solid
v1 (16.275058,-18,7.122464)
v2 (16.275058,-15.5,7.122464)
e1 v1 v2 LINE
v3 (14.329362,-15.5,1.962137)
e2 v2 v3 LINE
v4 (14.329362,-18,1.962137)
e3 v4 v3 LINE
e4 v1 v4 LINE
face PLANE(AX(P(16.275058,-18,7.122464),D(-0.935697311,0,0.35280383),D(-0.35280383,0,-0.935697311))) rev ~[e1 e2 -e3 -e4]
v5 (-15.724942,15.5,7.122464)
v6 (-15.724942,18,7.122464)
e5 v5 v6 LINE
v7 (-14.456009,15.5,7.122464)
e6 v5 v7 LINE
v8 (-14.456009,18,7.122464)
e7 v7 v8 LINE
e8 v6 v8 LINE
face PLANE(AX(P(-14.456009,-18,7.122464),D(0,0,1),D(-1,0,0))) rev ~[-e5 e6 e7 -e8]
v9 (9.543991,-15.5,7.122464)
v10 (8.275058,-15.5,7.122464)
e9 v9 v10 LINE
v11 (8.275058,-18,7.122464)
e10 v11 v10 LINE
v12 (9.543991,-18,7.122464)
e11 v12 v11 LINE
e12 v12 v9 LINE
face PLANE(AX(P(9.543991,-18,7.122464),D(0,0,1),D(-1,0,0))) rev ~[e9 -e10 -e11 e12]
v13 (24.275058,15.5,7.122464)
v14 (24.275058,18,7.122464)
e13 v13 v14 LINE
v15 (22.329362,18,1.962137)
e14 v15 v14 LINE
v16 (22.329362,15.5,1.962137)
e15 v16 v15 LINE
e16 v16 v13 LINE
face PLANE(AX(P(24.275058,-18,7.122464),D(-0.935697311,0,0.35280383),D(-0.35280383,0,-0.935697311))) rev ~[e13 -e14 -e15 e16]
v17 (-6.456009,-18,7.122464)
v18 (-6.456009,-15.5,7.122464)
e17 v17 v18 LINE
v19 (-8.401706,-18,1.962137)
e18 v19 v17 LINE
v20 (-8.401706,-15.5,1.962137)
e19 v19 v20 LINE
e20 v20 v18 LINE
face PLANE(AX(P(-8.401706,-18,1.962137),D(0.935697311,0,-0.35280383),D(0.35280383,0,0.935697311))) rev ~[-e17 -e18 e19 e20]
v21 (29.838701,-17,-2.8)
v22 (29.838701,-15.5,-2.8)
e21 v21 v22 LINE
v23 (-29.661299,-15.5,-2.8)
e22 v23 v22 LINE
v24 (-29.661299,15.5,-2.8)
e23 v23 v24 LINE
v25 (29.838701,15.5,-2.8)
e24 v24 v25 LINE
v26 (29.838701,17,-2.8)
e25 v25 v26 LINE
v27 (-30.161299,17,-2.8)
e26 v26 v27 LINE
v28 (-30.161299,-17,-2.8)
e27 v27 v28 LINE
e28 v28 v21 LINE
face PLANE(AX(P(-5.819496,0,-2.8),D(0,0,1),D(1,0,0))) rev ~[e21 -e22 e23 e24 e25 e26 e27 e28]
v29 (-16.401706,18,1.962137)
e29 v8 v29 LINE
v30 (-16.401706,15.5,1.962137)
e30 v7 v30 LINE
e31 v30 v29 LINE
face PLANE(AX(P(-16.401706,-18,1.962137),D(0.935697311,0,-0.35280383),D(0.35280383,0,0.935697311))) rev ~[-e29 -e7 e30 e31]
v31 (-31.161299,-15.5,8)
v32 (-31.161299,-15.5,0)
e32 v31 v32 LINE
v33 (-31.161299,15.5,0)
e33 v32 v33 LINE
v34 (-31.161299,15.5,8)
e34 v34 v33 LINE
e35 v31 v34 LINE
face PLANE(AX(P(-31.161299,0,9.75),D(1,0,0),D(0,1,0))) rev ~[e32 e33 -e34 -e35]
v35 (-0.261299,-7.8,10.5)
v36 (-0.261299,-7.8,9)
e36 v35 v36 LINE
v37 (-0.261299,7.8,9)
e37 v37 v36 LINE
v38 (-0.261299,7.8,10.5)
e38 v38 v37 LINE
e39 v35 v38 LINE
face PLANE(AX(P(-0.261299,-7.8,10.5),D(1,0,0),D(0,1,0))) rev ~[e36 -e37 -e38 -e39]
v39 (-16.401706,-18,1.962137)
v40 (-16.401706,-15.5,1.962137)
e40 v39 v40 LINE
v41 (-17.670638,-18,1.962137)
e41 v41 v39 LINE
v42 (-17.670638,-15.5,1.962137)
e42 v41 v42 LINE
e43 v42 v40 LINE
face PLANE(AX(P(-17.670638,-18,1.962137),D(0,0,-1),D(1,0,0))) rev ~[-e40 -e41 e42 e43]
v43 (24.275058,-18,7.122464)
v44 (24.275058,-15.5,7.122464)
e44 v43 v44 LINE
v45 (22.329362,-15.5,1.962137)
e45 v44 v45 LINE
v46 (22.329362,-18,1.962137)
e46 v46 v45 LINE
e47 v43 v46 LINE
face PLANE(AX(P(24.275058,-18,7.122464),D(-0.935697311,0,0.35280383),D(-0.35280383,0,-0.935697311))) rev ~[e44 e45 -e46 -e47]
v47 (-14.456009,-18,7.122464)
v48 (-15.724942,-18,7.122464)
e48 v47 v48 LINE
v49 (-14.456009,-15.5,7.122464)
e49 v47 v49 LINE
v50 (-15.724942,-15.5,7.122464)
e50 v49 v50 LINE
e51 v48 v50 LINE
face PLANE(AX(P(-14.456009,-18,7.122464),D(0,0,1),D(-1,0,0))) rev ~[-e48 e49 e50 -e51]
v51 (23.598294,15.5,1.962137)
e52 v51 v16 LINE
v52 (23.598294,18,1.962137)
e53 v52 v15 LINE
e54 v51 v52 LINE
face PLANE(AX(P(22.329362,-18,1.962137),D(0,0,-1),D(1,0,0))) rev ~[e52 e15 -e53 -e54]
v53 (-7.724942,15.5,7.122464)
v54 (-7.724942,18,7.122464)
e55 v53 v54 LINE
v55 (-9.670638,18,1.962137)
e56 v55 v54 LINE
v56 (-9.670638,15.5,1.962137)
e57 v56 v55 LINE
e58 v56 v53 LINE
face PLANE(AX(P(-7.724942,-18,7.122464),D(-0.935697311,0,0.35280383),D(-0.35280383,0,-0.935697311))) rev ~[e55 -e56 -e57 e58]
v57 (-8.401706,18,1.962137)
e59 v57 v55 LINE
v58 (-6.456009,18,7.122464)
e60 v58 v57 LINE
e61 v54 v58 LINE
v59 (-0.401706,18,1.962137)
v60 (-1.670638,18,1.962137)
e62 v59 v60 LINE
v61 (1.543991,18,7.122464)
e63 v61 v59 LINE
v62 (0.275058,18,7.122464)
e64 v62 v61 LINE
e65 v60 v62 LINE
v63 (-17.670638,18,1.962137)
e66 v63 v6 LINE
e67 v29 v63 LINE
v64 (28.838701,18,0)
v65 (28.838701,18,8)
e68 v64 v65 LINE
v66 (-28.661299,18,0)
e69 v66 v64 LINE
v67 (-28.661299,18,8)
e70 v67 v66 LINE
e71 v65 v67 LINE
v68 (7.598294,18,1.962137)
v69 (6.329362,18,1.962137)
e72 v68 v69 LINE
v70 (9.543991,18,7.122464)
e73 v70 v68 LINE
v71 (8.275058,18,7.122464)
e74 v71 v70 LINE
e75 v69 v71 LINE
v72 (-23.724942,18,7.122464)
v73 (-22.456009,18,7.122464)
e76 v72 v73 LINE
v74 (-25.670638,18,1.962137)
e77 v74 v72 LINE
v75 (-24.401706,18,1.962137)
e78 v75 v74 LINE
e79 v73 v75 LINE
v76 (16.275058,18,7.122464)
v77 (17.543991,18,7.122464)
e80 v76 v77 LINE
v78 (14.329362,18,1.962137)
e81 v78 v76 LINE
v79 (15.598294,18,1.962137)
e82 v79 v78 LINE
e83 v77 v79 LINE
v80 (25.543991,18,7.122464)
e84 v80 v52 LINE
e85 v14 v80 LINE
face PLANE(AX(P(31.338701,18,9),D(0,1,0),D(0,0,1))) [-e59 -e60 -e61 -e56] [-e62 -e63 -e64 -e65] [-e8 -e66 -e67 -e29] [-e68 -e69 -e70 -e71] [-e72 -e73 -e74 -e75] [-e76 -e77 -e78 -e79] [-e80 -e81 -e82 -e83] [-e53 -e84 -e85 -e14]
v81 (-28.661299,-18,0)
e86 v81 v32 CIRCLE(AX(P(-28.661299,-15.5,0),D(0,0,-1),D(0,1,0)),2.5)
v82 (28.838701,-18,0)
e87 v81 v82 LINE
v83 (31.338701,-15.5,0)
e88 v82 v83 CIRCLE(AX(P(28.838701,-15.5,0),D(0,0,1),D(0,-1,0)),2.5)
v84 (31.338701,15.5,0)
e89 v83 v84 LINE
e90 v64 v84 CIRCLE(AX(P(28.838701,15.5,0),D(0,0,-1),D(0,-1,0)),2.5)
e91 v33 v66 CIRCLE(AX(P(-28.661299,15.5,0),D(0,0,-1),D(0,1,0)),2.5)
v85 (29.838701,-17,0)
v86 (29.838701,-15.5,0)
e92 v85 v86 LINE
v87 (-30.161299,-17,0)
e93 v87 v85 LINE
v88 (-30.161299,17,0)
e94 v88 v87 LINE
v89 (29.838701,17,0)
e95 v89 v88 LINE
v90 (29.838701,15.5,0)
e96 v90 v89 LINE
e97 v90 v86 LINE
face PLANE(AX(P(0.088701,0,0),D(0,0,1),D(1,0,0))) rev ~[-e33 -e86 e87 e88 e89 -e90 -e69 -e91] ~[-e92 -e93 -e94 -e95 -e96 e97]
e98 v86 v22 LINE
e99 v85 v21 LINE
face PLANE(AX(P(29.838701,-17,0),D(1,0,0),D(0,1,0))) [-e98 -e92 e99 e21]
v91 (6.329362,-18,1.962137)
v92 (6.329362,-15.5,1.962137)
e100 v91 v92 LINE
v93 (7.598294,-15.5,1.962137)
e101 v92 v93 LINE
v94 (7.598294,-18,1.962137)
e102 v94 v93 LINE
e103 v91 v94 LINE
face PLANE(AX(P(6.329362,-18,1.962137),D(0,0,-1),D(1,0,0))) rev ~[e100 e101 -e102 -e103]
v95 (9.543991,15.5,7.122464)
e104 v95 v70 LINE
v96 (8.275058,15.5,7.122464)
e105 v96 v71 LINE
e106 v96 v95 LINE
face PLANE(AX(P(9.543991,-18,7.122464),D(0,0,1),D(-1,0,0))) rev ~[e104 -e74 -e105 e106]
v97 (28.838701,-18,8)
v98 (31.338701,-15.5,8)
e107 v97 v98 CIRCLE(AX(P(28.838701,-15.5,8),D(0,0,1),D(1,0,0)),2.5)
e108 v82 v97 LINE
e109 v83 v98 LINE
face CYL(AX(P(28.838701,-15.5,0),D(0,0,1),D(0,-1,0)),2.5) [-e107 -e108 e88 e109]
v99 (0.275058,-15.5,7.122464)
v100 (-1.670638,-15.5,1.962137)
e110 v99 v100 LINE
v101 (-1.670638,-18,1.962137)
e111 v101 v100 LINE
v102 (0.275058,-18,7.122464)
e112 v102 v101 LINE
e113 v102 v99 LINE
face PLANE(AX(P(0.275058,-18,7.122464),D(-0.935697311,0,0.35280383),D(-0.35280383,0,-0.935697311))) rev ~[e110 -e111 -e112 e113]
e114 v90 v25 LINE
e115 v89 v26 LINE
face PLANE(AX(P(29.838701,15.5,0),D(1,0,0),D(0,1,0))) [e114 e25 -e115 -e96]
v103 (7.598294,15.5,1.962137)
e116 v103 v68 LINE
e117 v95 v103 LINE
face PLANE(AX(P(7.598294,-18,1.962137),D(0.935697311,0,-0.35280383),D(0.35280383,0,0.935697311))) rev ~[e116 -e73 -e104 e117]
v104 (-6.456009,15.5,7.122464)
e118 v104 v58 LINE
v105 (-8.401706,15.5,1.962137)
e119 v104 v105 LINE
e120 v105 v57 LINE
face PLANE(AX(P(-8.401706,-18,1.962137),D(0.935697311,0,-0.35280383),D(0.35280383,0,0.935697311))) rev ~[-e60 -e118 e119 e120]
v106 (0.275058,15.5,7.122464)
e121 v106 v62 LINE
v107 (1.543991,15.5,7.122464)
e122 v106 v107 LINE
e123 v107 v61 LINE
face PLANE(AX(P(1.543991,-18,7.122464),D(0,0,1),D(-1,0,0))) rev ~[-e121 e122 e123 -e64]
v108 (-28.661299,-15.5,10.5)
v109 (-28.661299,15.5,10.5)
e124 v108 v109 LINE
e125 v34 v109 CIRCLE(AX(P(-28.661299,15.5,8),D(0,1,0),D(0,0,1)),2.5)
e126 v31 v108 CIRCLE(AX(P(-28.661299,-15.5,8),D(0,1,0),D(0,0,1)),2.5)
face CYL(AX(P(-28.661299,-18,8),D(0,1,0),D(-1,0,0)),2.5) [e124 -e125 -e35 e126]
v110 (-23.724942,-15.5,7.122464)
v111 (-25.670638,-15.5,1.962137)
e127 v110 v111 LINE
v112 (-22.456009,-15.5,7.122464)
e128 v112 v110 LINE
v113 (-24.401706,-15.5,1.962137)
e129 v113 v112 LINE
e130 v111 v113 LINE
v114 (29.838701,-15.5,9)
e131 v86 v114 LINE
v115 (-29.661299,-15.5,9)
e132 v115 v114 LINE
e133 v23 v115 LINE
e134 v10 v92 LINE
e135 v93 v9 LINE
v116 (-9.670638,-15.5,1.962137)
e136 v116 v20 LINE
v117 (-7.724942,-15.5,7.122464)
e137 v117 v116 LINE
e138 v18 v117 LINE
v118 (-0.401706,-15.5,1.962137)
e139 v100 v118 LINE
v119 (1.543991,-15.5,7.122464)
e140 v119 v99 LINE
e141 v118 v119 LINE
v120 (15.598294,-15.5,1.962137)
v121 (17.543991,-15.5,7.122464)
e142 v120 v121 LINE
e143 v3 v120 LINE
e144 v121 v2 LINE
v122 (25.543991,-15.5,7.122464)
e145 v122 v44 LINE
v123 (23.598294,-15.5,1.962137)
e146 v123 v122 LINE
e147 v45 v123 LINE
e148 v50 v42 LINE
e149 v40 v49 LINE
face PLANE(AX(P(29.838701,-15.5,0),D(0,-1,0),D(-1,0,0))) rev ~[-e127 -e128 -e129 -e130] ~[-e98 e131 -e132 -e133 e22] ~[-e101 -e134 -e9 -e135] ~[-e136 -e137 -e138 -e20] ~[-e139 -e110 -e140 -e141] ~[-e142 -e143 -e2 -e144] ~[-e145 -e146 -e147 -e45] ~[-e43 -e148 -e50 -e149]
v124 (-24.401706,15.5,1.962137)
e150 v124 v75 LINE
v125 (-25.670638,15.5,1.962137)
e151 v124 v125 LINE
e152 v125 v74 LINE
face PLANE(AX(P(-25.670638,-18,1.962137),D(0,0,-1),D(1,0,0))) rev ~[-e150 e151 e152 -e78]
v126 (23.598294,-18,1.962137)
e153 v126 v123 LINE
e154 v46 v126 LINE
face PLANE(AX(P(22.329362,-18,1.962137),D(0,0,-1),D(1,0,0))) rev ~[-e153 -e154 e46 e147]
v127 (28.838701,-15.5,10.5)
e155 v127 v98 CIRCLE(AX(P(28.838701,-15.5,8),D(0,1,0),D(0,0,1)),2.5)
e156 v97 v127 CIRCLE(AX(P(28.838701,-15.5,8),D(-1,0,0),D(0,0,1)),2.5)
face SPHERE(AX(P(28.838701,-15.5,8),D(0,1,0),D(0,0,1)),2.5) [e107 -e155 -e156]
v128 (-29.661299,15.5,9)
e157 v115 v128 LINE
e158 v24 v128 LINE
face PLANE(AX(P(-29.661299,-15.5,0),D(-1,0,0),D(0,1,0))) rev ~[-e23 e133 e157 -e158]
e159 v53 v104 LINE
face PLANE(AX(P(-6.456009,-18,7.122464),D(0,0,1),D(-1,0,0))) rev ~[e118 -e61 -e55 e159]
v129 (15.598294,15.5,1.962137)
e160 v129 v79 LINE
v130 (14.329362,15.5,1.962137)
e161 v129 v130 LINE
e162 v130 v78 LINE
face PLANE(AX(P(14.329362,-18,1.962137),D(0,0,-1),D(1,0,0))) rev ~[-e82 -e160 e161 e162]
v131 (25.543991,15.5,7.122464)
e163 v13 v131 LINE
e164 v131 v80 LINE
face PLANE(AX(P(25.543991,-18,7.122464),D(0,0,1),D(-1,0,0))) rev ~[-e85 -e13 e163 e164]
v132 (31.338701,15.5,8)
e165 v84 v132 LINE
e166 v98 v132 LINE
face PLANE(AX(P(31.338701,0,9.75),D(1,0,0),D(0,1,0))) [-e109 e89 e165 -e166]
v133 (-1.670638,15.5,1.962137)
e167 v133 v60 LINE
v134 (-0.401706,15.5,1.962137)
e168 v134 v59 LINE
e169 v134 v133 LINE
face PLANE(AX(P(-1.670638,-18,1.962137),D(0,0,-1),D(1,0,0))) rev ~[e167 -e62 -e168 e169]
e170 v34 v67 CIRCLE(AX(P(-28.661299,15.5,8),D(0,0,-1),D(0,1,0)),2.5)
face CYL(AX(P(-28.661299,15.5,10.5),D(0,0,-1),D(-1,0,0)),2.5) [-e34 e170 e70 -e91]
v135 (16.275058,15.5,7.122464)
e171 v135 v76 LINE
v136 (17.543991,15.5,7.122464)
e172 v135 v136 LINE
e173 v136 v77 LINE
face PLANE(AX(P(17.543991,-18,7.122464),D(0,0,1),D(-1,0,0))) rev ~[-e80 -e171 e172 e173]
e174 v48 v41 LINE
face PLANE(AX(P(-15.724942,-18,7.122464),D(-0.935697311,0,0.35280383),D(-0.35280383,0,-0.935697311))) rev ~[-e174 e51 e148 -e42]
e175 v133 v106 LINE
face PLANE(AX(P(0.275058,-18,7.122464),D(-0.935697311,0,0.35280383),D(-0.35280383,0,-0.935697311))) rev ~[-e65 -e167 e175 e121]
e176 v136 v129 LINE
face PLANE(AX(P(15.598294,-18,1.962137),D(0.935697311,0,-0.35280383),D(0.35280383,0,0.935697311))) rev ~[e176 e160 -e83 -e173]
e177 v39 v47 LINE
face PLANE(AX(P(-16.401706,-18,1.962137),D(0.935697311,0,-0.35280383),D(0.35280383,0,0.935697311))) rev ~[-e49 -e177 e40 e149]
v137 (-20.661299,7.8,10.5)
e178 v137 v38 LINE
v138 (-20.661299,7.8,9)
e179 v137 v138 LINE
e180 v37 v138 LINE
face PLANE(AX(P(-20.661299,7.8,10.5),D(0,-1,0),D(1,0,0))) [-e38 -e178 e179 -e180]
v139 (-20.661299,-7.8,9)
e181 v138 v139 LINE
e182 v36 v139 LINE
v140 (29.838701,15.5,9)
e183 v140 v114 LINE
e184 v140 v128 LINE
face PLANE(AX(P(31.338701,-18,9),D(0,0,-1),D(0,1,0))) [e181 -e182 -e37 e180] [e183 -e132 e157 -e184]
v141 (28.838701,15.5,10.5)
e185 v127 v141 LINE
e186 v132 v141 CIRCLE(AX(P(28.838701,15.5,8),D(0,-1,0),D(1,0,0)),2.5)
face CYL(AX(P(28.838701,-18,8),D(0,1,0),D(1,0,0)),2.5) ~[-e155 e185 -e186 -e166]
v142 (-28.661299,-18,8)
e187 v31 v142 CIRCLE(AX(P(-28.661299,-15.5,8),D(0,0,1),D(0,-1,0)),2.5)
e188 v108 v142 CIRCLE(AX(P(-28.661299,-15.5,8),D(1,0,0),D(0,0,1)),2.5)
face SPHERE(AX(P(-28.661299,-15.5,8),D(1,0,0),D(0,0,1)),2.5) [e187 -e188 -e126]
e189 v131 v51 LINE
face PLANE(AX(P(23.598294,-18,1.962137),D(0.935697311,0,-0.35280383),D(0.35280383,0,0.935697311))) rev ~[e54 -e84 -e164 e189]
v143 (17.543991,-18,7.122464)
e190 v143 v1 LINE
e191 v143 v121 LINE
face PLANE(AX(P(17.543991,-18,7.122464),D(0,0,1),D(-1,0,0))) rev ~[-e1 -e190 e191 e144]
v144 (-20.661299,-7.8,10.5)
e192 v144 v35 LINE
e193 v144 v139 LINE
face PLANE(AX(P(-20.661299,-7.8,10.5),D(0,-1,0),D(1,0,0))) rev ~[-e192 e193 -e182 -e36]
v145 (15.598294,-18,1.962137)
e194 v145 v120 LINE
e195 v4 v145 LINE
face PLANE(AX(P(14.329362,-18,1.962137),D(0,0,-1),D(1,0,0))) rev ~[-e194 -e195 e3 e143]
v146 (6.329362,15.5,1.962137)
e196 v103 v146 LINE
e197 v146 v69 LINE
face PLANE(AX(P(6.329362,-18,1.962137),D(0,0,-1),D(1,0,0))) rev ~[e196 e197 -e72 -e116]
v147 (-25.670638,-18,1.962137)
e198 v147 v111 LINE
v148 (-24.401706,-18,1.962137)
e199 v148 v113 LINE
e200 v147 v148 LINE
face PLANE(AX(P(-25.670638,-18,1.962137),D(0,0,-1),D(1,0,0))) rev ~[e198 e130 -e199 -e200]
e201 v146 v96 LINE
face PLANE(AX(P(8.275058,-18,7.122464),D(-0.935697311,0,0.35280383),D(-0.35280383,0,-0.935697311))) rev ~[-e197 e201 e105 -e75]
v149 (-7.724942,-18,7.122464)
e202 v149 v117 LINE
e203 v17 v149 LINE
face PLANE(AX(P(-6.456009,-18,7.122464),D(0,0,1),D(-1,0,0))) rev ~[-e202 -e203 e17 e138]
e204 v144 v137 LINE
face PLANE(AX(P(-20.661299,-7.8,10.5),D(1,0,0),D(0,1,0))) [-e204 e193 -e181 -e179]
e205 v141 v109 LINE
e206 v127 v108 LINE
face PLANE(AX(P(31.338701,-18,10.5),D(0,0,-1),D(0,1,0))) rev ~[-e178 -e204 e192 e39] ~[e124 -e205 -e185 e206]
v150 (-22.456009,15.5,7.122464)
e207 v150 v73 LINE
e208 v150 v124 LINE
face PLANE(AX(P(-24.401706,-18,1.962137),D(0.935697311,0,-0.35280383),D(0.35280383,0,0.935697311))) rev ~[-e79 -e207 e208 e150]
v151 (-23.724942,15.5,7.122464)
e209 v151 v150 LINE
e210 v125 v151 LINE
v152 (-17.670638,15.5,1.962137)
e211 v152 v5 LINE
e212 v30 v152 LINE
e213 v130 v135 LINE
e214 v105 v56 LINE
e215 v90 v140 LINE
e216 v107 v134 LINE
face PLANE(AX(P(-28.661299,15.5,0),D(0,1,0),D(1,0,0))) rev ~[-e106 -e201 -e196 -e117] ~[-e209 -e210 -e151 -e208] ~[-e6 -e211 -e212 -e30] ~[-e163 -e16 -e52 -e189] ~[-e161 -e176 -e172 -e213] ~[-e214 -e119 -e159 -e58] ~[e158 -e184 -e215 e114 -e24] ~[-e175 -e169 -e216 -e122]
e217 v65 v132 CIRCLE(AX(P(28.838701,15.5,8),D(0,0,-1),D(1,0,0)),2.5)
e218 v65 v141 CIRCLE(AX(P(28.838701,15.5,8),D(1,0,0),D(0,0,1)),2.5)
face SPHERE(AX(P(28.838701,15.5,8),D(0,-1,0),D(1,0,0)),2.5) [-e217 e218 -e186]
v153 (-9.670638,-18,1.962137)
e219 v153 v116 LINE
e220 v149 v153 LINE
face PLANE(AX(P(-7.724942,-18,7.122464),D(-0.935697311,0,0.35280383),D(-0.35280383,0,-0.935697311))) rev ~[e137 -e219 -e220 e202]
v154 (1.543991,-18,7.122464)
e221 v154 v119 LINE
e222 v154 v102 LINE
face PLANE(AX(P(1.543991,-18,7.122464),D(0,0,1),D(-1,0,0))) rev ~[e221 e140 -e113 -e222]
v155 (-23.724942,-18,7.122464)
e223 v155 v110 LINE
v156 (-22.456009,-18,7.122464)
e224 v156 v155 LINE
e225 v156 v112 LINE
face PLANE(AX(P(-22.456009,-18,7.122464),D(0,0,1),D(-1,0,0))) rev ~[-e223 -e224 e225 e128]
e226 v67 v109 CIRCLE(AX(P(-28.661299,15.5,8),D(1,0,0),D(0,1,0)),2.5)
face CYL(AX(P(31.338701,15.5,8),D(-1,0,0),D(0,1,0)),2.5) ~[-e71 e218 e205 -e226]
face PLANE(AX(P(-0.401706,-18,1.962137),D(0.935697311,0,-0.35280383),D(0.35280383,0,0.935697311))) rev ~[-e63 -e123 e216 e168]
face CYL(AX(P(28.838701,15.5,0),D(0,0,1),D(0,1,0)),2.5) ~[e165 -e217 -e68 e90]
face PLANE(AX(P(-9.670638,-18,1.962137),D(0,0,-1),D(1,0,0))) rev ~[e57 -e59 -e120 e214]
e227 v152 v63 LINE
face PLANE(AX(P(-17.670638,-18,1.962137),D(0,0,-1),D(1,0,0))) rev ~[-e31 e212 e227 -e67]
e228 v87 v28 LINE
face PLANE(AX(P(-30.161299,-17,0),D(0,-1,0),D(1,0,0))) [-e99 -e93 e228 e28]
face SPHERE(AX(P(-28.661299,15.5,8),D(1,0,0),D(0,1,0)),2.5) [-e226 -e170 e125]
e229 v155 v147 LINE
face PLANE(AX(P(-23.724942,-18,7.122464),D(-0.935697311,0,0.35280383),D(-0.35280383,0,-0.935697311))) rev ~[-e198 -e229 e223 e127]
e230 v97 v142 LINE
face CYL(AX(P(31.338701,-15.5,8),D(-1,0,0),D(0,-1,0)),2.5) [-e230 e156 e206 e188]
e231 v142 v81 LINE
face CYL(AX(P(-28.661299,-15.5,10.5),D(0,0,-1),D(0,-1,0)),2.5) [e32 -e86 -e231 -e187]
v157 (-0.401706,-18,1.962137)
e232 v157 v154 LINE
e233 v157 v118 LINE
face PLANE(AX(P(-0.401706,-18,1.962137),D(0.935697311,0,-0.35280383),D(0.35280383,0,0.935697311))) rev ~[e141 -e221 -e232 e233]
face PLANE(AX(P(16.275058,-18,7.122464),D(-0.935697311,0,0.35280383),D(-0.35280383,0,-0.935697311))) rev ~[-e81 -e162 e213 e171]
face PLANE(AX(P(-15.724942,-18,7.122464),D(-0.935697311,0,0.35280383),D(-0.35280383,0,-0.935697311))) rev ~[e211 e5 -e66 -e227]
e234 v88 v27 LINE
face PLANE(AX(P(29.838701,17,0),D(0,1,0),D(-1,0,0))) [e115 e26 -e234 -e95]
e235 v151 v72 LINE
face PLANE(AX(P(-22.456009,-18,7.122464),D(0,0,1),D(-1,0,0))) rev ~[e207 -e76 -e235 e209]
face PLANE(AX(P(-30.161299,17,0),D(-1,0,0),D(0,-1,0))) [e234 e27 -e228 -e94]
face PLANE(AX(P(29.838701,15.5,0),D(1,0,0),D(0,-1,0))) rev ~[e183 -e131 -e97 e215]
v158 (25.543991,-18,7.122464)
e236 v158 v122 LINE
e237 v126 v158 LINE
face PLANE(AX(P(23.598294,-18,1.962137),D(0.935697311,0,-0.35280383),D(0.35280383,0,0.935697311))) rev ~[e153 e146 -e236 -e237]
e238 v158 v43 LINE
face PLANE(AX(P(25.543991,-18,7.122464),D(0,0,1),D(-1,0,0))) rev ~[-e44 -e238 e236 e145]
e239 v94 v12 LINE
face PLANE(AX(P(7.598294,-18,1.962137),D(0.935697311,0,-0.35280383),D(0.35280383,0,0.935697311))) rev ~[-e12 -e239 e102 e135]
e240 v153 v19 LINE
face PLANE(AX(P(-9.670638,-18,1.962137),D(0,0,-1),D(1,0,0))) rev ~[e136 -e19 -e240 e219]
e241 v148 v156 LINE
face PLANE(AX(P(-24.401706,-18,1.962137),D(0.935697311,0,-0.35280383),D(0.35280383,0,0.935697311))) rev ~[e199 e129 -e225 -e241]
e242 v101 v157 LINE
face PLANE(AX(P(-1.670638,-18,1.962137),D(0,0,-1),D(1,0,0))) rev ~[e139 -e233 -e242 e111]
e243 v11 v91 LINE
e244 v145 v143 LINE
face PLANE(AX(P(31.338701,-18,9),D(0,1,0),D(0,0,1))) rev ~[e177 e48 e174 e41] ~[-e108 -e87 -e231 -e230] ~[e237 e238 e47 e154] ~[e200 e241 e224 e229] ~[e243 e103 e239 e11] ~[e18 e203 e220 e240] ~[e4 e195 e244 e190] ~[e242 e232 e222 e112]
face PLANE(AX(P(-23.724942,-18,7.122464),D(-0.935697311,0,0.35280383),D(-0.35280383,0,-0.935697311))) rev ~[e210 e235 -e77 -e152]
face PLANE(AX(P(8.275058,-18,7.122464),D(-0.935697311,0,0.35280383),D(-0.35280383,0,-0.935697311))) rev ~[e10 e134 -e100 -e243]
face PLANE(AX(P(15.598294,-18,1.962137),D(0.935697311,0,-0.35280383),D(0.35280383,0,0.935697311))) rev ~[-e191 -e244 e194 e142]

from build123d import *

# Parameters (mm, degrees)
F1_DEPTH  = 2.8
F0_W      = 62.5
F0_H      = 36
F2_DEPTH  = 9
F3_W      = 36
F3_H      = 1.5
F4_DEPTH  = 62.5
F5_R      = 2.5
F6_DEPTH  = 1
F9_W      = 20.4
F9_H      = 15.6
F10_DEPTH = 13.301
F12_DEPTH = 50


# Not quite as in the source:
# - a feature names something its author has since deleted; it is built from what else it names


with BuildPart() as f1:
    # F0 (on Top) → F1 (new body)
    with BuildSketch(Plane.XY):
        Polygon((29.8387005084, 17), (-30.1612994916, 17), (-30.1612994916, -17), (29.8387005084, -17), (29.8387005084, -15.5), (-28.6612994916, -15.5), (-28.6612994916, 15.5), (29.8387005084, 15.5), align=None)
    extrude(amount=-F1_DEPTH)

    # F0 (on Top) → F2 (join)
    with BuildSketch(Plane.XY):
        with Locations((0.0887005084, 0)):
            Rectangle(F0_W, F0_H)
        Polygon((-30.1612994916, -17), (-30.1612994916, 17), (29.8387005084, 17), (29.8387005084, 15.5), (29.8387005084, -15.5), (29.8387005084, -17), align=None, mode=Mode.SUBTRACT)
        Polygon((29.8387005084, 17), (-30.1612994916, 17), (-30.1612994916, -17), (29.8387005084, -17), (29.8387005084, -15.5), (-28.6612994916, -15.5), (-28.6612994916, 15.5), (29.8387005084, 15.5), align=None)
    extrude(amount=F2_DEPTH)

    # F3 (on face) → F4 (join, through all)
    with BuildSketch(Plane.YZ.offset(31.3387005084)):
        with Locations((0, 9.75)):
            Rectangle(F3_W, F3_H)
    extrude(amount=-F4_DEPTH)

    # F5
    f5_edges = [f1.edges().sort_by_distance(p)[0] for p in [
        (31.338701, 0, 10.5),
        (0.088701, -18, 10.5),
        (31.338701, -18, 5.25),
        (31.338701, 18, 5.25),
        (0.088701, 18, 10.5),
        (-31.161299, 18, 5.25),
        (-31.161299, 0, 10.5),
        (-31.161299, -18, 5.25),
    ]]
    fillet(f5_edges, radius=F5_R)

    # F6 (cut): a face of the model
    f6_faces = [f1.faces().sort_by_distance(p)[0] for p in [
        (-28.6612994916, 0, 3.1),
    ]]
    extrude(f6_faces, amount=-F6_DEPTH, mode=Mode.SUBTRACT)

    # F9 (on face) → F10 (cut, through all)
    with BuildSketch(Plane.XY.offset(10.5)):
        with Locations((-10.4612994916, 0)):
            Rectangle(F9_W, F9_H)
    extrude(amount=-F10_DEPTH, mode=Mode.SUBTRACT)

    # F11 (on face) → F12 (cut)
    with BuildSketch(Plane.XZ.offset(18)):
        Polygon((-23.7249415368, 7.122464478), (-25.6706383079, 1.9621371757), (-24.4017057121, 1.9621371757), (-22.4560089409, 7.122464478), align=None)
        Polygon((-15.7249415368, 7.122464478), (-17.6706383079, 1.9621371757), (-16.4017057121, 1.9621371757), (-14.4560089409, 7.122464478), align=None)
        Polygon((-7.7249415368, 7.122464478), (-9.6706383079, 1.9621371757), (-8.4017057121, 1.9621371757), (-6.4560089409, 7.122464478), align=None)
        Polygon((0.2750584632, 7.122464478), (-1.6706383079, 1.9621371757), (-0.4017057121, 1.9621371757), (1.5439910591, 7.122464478), align=None)
        Polygon((8.2750584632, 7.122464478), (6.3293616921, 1.9621371757), (7.5982942879, 1.9621371757), (9.5439910591, 7.122464478), align=None)
        Polygon((16.2750584632, 7.122464478), (14.3293616921, 1.9621371757), (15.5982942879, 1.9621371757), (17.5439910591, 7.122464478), align=None)
        Polygon((24.2750584632, 7.122464478), (22.3293616921, 1.9621371757), (23.5982942879, 1.9621371757), (25.5439910591, 7.122464478), align=None)
    extrude(amount=-F12_DEPTH, mode=Mode.SUBTRACT)


solid = f1.part
